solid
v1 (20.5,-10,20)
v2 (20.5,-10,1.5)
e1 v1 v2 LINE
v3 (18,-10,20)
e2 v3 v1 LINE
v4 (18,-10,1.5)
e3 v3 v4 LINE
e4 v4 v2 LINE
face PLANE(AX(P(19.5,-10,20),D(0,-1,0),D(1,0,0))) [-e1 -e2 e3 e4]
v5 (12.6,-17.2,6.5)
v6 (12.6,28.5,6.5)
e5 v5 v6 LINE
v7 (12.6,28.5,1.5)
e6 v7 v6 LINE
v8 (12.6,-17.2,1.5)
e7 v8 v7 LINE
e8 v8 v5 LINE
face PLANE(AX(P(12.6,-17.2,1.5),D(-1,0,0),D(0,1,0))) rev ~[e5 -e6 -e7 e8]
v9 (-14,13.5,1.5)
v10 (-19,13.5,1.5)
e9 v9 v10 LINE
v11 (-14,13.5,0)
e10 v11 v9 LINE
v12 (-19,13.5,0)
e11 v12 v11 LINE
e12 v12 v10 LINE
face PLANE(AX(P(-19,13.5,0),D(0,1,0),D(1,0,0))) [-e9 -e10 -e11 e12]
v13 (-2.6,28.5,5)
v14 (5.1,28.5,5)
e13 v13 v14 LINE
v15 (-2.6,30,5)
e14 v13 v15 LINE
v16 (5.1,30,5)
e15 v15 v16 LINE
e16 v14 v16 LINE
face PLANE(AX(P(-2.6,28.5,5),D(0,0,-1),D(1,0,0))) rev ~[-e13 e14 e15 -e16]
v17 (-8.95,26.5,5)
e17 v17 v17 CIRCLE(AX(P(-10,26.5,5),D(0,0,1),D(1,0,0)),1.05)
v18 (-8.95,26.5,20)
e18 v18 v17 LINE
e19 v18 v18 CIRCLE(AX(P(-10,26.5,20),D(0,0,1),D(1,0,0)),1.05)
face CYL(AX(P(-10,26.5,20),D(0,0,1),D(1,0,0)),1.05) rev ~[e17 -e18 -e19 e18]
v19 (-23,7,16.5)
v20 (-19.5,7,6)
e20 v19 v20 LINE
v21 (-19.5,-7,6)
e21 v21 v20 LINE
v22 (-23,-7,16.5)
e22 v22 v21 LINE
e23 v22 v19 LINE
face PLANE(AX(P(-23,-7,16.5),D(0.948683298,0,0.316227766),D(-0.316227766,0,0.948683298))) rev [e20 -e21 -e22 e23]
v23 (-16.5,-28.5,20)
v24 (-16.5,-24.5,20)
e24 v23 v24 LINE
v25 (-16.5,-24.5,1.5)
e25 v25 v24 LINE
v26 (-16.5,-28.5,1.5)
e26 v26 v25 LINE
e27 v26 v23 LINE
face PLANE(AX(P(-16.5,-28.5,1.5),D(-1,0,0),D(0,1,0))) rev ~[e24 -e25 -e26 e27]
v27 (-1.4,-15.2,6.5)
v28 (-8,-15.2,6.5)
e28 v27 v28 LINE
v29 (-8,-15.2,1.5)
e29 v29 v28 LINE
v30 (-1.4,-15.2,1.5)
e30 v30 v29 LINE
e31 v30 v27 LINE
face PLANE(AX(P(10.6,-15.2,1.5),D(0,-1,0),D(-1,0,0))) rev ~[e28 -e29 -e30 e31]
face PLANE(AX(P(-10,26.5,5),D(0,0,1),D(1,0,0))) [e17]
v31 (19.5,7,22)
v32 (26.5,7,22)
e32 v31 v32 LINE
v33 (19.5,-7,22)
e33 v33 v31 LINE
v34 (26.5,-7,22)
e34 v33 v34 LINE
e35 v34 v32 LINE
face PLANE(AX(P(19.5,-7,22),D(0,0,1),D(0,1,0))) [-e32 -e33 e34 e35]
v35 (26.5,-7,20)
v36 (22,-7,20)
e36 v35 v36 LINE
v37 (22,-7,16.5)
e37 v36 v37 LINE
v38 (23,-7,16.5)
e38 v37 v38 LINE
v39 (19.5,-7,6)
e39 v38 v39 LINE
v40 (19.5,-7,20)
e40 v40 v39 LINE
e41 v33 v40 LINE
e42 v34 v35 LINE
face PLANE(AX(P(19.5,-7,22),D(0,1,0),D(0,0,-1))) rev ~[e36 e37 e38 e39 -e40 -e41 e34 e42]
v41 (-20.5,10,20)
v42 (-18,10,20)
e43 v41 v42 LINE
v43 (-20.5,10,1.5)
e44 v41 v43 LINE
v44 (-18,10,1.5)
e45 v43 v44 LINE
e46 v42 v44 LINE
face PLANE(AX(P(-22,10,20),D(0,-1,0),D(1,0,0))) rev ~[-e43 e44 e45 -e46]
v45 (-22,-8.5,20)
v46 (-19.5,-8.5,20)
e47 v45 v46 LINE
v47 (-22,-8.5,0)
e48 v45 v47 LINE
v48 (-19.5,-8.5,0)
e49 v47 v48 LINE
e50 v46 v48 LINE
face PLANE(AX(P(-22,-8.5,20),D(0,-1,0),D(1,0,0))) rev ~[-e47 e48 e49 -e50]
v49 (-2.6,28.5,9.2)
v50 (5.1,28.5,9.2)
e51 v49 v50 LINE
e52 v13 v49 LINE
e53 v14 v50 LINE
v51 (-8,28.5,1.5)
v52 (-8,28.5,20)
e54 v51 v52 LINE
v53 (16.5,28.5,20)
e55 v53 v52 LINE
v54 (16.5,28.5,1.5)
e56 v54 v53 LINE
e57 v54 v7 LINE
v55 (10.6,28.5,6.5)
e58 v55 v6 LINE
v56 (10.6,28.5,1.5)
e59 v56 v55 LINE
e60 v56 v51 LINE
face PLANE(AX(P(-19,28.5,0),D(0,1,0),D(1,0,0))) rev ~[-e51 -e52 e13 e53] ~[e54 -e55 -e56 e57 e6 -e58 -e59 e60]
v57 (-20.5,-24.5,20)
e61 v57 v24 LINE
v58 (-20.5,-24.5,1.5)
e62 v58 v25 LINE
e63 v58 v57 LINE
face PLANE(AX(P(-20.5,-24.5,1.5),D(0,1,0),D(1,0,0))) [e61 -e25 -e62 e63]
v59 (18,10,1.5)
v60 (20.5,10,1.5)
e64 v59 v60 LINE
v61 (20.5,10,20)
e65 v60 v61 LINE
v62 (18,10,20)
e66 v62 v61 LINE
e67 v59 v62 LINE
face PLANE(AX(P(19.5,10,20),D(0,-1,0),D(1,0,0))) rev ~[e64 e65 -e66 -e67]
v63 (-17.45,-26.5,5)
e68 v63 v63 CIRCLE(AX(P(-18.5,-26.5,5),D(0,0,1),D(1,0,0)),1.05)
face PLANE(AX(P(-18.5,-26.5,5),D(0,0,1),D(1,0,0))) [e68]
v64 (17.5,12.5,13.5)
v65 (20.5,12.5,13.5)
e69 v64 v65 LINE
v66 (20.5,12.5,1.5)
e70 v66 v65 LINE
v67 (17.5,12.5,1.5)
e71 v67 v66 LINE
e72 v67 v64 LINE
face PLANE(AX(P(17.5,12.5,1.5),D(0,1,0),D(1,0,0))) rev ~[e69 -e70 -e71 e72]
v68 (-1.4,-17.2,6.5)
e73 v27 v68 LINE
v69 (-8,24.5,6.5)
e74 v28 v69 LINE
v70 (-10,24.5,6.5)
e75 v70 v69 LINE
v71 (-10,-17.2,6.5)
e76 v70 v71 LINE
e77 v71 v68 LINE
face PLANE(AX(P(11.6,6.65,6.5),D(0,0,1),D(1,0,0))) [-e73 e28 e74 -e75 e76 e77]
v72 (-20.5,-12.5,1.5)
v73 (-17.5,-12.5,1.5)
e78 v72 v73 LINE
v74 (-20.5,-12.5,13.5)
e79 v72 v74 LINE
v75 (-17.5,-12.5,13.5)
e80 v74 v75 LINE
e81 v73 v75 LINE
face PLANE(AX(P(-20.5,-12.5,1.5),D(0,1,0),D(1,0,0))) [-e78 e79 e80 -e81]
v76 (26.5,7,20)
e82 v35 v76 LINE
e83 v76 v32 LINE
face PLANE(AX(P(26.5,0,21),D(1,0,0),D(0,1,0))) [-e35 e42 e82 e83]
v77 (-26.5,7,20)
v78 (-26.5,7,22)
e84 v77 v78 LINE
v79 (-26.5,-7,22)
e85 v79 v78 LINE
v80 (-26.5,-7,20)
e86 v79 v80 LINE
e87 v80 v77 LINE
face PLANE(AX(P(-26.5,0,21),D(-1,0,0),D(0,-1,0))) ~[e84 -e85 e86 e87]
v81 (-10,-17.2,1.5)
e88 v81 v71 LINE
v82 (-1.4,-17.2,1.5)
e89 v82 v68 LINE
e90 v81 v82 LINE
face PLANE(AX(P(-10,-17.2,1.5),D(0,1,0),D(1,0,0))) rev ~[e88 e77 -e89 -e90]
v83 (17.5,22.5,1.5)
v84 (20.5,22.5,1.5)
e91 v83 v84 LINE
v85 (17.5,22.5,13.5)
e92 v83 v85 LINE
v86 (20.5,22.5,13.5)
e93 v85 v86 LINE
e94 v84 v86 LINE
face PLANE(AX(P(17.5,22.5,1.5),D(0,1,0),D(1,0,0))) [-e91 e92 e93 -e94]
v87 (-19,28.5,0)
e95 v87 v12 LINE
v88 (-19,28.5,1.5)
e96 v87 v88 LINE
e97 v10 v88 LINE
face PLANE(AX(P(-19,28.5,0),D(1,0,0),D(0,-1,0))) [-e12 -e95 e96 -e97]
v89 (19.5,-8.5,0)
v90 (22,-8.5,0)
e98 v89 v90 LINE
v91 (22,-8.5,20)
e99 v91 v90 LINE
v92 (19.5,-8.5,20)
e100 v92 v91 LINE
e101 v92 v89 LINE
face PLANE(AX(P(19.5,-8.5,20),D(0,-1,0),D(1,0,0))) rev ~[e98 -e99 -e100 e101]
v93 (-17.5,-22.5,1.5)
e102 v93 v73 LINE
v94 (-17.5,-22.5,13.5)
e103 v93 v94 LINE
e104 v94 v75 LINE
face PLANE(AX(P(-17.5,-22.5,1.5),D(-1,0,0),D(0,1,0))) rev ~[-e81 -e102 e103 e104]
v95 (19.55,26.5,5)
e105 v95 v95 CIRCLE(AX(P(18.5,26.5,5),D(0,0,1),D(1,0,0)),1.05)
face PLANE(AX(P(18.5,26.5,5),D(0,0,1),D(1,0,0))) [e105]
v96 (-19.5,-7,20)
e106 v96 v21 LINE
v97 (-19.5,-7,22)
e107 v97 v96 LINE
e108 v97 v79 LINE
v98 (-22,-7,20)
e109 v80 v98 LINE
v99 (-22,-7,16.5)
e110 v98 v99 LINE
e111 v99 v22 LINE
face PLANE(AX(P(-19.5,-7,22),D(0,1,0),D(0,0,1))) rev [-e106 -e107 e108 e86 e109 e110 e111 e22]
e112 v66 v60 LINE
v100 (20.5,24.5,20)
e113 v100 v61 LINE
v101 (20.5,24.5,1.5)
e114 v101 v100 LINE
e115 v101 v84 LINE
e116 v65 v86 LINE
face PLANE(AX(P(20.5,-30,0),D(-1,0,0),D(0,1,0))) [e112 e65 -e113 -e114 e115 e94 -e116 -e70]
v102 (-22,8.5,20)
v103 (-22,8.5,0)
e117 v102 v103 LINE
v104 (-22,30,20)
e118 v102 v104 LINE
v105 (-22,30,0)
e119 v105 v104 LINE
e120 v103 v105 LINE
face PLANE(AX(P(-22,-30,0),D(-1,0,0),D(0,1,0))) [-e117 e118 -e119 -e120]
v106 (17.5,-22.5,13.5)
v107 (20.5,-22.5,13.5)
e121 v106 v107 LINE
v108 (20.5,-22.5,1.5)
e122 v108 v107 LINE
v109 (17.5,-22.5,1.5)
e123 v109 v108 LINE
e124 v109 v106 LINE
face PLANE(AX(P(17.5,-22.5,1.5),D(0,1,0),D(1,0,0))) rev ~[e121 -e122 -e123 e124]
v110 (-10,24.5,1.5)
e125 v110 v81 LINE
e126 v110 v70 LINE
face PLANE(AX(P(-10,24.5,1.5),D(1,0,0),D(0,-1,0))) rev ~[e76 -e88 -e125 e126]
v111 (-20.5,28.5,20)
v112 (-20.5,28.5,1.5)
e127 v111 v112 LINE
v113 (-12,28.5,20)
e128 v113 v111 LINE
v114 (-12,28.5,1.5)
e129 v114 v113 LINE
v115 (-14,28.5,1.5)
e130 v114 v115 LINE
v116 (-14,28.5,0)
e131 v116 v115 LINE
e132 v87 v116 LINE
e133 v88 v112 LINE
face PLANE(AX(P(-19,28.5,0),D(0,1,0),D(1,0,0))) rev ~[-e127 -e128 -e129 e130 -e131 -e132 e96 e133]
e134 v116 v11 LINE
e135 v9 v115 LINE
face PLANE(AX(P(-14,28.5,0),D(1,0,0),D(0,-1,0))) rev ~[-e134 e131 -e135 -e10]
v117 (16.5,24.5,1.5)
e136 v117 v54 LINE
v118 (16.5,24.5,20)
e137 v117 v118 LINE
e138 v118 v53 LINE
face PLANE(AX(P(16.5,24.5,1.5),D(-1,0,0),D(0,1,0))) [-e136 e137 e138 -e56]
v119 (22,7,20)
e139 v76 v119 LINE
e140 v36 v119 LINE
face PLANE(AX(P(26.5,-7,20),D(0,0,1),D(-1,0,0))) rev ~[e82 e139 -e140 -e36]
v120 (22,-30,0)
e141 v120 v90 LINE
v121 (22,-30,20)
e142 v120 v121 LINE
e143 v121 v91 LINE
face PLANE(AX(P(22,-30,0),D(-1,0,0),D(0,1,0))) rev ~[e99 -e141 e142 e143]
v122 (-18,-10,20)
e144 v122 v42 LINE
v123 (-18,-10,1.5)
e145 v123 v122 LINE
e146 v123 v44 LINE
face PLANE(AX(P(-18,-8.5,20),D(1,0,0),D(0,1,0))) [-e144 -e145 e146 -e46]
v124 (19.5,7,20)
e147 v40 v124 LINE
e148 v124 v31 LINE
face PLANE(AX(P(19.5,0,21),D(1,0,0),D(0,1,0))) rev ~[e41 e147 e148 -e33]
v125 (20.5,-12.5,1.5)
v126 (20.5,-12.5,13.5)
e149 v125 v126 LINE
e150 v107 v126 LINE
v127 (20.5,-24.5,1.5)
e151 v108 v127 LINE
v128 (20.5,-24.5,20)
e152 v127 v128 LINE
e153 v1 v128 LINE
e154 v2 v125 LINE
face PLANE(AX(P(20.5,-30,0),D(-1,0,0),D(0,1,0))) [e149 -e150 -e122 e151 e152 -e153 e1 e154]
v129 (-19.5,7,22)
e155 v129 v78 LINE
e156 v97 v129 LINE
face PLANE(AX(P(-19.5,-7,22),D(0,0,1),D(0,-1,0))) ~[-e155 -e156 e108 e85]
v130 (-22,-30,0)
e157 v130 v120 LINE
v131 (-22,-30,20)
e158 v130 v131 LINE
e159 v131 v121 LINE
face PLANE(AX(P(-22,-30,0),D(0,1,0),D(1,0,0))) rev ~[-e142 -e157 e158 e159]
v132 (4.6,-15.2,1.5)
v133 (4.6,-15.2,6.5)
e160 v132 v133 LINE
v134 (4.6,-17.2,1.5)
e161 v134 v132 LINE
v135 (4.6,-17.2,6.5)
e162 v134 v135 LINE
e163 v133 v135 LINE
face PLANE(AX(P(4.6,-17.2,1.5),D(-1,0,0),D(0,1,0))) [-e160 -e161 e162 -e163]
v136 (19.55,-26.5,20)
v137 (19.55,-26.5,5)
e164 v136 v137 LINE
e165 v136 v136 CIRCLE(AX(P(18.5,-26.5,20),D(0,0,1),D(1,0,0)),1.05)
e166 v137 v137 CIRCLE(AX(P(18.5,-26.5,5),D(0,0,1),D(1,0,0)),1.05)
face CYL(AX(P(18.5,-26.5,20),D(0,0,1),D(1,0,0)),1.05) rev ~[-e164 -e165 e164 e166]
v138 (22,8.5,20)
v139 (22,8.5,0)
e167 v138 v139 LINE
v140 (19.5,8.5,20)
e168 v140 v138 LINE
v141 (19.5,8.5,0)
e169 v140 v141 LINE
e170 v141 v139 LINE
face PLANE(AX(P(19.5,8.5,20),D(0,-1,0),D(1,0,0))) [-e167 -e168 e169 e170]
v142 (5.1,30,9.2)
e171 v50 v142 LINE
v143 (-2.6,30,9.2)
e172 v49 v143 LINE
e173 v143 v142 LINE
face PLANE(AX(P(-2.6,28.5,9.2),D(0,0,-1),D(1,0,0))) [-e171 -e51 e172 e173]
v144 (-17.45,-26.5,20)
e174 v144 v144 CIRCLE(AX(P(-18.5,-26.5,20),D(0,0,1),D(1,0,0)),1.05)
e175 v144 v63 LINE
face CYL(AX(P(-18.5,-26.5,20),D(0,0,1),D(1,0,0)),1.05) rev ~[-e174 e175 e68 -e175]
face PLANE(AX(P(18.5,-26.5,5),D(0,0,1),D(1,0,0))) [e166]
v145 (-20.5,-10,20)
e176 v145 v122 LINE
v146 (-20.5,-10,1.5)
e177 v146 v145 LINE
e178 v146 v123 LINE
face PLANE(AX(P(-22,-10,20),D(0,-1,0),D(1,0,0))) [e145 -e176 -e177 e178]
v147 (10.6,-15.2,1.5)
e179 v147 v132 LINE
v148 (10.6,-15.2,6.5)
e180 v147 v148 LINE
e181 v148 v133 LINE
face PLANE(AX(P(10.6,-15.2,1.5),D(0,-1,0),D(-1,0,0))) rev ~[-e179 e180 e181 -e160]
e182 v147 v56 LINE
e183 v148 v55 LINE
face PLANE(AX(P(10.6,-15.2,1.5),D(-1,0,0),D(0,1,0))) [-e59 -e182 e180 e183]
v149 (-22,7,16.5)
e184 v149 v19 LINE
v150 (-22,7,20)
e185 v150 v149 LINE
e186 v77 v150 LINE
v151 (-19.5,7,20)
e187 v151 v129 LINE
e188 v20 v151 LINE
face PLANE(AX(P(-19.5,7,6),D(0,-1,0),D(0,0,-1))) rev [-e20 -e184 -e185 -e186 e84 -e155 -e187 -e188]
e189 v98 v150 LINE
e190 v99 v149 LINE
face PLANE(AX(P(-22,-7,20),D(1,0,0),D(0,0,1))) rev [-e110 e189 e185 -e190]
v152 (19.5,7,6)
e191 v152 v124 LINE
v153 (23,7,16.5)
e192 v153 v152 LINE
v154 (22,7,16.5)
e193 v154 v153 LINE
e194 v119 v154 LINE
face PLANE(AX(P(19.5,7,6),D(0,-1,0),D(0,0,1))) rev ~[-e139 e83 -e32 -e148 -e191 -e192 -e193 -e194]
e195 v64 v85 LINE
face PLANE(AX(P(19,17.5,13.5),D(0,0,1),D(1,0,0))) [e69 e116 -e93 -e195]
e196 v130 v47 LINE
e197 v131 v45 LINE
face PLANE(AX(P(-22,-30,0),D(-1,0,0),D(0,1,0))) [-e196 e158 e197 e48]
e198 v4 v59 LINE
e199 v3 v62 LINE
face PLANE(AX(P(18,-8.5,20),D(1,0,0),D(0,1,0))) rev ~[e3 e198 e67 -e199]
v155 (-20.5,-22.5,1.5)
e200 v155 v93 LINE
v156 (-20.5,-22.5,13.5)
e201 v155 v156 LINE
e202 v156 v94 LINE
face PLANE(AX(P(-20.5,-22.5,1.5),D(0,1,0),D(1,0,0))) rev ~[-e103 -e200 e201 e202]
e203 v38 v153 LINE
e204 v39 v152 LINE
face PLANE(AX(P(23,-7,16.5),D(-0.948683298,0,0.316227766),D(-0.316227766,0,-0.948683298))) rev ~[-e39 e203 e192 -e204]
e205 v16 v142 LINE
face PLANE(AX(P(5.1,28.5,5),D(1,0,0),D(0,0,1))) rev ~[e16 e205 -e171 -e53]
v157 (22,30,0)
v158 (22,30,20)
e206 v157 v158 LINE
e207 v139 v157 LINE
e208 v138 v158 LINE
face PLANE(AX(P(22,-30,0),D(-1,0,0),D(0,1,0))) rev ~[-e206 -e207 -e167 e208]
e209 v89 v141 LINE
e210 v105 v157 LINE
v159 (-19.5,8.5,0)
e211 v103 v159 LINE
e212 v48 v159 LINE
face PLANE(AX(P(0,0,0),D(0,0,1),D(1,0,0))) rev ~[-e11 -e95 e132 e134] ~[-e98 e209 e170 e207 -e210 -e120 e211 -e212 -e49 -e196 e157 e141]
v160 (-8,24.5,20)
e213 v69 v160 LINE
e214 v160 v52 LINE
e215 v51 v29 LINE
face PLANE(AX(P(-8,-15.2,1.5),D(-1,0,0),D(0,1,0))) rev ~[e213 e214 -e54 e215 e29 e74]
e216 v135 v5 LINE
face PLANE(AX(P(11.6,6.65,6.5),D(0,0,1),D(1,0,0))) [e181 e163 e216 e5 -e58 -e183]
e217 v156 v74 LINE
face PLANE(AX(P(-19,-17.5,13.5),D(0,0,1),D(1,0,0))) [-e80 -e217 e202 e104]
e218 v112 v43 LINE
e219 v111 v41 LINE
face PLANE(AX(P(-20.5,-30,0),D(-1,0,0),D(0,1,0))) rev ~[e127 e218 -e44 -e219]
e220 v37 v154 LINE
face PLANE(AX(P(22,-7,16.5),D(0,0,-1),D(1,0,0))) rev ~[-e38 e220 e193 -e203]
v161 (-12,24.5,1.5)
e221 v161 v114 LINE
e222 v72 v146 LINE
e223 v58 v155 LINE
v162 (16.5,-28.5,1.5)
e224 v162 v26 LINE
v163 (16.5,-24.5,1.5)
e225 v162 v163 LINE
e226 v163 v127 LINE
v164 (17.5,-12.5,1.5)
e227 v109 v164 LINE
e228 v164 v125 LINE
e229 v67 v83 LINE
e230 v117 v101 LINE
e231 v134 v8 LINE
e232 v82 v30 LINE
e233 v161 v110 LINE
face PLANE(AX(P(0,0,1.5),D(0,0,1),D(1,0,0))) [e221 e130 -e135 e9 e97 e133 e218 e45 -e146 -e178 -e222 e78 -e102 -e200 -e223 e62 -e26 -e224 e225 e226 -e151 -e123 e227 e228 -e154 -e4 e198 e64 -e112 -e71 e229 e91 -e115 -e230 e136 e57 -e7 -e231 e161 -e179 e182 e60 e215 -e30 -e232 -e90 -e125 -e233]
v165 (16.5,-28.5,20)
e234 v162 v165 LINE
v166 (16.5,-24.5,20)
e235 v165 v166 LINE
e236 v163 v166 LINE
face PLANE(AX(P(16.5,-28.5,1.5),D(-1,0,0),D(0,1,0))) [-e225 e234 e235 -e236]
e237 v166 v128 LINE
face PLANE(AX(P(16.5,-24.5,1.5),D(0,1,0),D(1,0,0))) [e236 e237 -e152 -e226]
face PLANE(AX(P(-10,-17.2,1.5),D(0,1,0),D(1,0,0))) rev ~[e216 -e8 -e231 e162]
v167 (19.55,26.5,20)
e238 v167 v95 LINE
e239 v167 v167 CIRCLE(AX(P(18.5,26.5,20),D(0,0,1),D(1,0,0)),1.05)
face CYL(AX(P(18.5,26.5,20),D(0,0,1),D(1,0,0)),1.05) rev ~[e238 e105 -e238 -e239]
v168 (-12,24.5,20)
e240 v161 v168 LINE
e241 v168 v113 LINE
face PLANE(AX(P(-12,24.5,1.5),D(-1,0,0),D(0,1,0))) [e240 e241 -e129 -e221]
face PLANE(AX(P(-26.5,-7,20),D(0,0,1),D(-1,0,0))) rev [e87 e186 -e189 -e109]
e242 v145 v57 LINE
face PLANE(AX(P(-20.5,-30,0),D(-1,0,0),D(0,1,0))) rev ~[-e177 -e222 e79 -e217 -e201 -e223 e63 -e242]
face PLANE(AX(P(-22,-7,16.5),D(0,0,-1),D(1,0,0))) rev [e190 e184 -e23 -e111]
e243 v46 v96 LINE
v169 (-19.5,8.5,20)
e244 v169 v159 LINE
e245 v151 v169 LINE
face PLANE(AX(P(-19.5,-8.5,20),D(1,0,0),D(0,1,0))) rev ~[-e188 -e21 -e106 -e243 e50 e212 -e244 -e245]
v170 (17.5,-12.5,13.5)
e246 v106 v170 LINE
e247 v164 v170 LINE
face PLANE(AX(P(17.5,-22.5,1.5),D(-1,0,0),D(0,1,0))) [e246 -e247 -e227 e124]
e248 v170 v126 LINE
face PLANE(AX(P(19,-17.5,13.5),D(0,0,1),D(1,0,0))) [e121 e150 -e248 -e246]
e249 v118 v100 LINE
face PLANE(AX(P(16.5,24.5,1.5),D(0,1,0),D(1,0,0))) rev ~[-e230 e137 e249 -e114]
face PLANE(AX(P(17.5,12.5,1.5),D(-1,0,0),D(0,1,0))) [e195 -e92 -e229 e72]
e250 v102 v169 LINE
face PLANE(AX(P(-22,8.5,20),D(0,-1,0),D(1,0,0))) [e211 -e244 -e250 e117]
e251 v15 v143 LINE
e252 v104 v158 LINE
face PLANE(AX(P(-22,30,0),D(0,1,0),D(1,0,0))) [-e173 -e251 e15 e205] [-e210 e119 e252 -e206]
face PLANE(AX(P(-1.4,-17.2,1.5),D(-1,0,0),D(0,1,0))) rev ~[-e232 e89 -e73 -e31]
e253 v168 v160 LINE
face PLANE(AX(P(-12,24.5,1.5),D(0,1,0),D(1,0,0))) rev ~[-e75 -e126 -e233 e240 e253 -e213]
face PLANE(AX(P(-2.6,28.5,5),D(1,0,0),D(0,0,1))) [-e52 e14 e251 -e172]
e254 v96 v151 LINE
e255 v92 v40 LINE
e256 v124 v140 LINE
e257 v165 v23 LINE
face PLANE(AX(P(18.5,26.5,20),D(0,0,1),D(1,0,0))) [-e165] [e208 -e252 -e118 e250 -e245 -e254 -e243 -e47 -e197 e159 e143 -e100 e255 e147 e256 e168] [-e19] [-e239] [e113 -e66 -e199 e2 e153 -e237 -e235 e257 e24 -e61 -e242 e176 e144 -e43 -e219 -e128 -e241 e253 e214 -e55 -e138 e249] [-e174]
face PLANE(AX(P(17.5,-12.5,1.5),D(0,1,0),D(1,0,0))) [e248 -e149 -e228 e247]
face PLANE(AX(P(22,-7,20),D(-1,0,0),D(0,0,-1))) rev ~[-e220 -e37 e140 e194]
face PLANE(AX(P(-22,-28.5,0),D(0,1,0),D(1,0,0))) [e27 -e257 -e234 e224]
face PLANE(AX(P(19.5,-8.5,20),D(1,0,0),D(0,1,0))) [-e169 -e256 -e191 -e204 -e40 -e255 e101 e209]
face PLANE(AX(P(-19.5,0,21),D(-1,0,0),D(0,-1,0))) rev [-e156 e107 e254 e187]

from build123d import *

# Parameters (mm, degrees)
F0_W      = 44
F0_H      = 60
F1_DEPTH  = 20
F2_W      = 2.5
F2_H      = 17
F3_DEPTH  = 20
F4_T      = -1.5
F5_W      = 5
F5_H      = 15
F6_DEPTH  = 2
F7_W      = 14
F7_H      = 2
F7_H_2    = 14
F8_DEPTH  = 7
F10_DEPTH = 14
F11_W     = 4
F11_H     = 4
F12_DEPTH = 18.5
F13_R     = 1.05
F14_DEPTH = 15
F15_W     = 7.7
F15_H     = 4.2
F16_DEPTH = 1.5
F17_W     = 2
F17_H     = 43.7
F17_H_2   = 39.7
F18_DEPTH = 5
F19_W     = 3
F19_H     = 10
F20_DEPTH = 12
F21_W     = 6
F21_H     = 2
F22_DEPTH = 10


# Not quite as in the source:
# - a pattern or mirror of a feature is missing from the dataset's text; its kind, count and spacing are read off the source's solid


with BuildPart() as f1:
    # F0 (on Top) → F1 (new body)
    with BuildSketch(Plane.XY):
        Rectangle(F0_W, F0_H)
    extrude(amount=F1_DEPTH)

    # F2 (on face) → F3 (cut)
    with BuildSketch(Plane.XY.offset(20)):
        with Locations((20.75, 0)):
            Rectangle(F2_W, F2_H)
        with Locations((-20.75, 0)):
            Rectangle(F2_W, F2_H)
    extrude(amount=-F3_DEPTH, mode=Mode.SUBTRACT)

    # F4
    f4_openings = [f1.faces().sort_by_distance(p)[0] for p in [
        (0, 0, 20),
    ]]
    offset(amount=F4_T, openings=f4_openings, kind=Kind.INTERSECTION)

    # F5 (on face) → F6 (cut)
    with BuildSketch(Plane(origin=(0, 0, 0), x_dir=(1, 0, 0), z_dir=(0, 0, -1))):
        with Locations((-16.5, -21)):
            Rectangle(F5_W, F5_H)
    extrude(amount=-F6_DEPTH, mode=Mode.SUBTRACT)

    # F7 (on face) → F8 (join)
    with BuildSketch(Plane.YZ.offset(19.5)):
        with Locations((0, 21)):
            Rectangle(F7_W, F7_H)
        with Locations((0, 13)):
            Rectangle(F7_W, F7_H_2)
    f8 = extrude(amount=F8_DEPTH)

    # F8_copies: F8 across plane
    add(f8.mirror(Plane(origin=(0, 0, 0), x_dir=(0, 0, -1), z_dir=(-1, 0, 0))))

    # F9 (on face) → F10 (cut)
    with BuildSketch(Plane.XZ.offset(7)):
        Polygon((23, 16.5), (19.5, 6), (26.5, 6), (26.5, 20), (22, 20), (22, 16.5), align=None)
    f10 = extrude(amount=-F10_DEPTH, mode=Mode.SUBTRACT)

    # F10_copies: F10 across plane
    add(f10.mirror(Plane(origin=(0, 0, 0), x_dir=(0, 0, -1), z_dir=(-1, 0, 0))), mode=Mode.SUBTRACT)

    # F11 (on face) → F12 (join, through all)
    with BuildSketch(Plane.XY.offset(1.5)):
        with Locations((18.5, 26.5)):
            Rectangle(F11_W, F11_H)
        with Locations((18.5, -26.5)):
            Rectangle(F11_W, F11_H)
        with Locations((-18.5, -26.5)):
            Rectangle(F11_W, F11_H)
        with Locations((-10, 26.5)):
            Rectangle(F11_W, F11_H)
    extrude(amount=F12_DEPTH)

    # F13 (on face) → F14 (cut)
    with BuildSketch(Plane.XY.offset(20)):
        with Locations((-10, 26.5)):
            Circle(F13_R)
        with Locations((18.5, 26.5)):
            Circle(F13_R)
        with Locations((18.5, -26.5)):
            Circle(F13_R)
        with Locations((-18.5, -26.5)):
            Circle(F13_R)
    extrude(amount=-F14_DEPTH, mode=Mode.SUBTRACT)

    # F15 (on face) → F16 (cut, through all)
    with BuildSketch(Plane.XZ.offset(-28.5)):
        with Locations((1.25, 7.1)):
            Rectangle(F15_W, F15_H)
    extrude(amount=-F16_DEPTH, mode=Mode.SUBTRACT)

    # F17 (on face) → F18 (join)
    with BuildSketch(Plane.XY.offset(1.5)):
        with Locations((11.6, 6.65)):
            Rectangle(F17_W, F17_H)
        Polygon((12.6, -15.2), (10.6, -15.2), (-8, -15.2), (-10, -15.2), (-10, -17.2), (12.6, -17.2), align=None)
        with Locations((-9, 4.65)):
            Rectangle(F17_W, F17_H_2)
    extrude(amount=F18_DEPTH)

    # F19 (on face) → F20 (join)
    with BuildSketch(Plane.XY.offset(1.5)):
        with Locations((19, 17.5)):
            Rectangle(F19_W, F19_H)
        with Locations((19, -17.5)):
            Rectangle(F19_W, F19_H)
        with Locations((-19, -17.5)):
            Rectangle(F19_W, F19_H)
    extrude(amount=F20_DEPTH)

    # F21 (on face) → F22 (cut)
    with BuildSketch(Plane.XY.offset(1.5)):
        with Locations((1.6, -16.2)):
            Rectangle(F21_W, F21_H)
    extrude(amount=F22_DEPTH, mode=Mode.SUBTRACT)


solid = f1.part
